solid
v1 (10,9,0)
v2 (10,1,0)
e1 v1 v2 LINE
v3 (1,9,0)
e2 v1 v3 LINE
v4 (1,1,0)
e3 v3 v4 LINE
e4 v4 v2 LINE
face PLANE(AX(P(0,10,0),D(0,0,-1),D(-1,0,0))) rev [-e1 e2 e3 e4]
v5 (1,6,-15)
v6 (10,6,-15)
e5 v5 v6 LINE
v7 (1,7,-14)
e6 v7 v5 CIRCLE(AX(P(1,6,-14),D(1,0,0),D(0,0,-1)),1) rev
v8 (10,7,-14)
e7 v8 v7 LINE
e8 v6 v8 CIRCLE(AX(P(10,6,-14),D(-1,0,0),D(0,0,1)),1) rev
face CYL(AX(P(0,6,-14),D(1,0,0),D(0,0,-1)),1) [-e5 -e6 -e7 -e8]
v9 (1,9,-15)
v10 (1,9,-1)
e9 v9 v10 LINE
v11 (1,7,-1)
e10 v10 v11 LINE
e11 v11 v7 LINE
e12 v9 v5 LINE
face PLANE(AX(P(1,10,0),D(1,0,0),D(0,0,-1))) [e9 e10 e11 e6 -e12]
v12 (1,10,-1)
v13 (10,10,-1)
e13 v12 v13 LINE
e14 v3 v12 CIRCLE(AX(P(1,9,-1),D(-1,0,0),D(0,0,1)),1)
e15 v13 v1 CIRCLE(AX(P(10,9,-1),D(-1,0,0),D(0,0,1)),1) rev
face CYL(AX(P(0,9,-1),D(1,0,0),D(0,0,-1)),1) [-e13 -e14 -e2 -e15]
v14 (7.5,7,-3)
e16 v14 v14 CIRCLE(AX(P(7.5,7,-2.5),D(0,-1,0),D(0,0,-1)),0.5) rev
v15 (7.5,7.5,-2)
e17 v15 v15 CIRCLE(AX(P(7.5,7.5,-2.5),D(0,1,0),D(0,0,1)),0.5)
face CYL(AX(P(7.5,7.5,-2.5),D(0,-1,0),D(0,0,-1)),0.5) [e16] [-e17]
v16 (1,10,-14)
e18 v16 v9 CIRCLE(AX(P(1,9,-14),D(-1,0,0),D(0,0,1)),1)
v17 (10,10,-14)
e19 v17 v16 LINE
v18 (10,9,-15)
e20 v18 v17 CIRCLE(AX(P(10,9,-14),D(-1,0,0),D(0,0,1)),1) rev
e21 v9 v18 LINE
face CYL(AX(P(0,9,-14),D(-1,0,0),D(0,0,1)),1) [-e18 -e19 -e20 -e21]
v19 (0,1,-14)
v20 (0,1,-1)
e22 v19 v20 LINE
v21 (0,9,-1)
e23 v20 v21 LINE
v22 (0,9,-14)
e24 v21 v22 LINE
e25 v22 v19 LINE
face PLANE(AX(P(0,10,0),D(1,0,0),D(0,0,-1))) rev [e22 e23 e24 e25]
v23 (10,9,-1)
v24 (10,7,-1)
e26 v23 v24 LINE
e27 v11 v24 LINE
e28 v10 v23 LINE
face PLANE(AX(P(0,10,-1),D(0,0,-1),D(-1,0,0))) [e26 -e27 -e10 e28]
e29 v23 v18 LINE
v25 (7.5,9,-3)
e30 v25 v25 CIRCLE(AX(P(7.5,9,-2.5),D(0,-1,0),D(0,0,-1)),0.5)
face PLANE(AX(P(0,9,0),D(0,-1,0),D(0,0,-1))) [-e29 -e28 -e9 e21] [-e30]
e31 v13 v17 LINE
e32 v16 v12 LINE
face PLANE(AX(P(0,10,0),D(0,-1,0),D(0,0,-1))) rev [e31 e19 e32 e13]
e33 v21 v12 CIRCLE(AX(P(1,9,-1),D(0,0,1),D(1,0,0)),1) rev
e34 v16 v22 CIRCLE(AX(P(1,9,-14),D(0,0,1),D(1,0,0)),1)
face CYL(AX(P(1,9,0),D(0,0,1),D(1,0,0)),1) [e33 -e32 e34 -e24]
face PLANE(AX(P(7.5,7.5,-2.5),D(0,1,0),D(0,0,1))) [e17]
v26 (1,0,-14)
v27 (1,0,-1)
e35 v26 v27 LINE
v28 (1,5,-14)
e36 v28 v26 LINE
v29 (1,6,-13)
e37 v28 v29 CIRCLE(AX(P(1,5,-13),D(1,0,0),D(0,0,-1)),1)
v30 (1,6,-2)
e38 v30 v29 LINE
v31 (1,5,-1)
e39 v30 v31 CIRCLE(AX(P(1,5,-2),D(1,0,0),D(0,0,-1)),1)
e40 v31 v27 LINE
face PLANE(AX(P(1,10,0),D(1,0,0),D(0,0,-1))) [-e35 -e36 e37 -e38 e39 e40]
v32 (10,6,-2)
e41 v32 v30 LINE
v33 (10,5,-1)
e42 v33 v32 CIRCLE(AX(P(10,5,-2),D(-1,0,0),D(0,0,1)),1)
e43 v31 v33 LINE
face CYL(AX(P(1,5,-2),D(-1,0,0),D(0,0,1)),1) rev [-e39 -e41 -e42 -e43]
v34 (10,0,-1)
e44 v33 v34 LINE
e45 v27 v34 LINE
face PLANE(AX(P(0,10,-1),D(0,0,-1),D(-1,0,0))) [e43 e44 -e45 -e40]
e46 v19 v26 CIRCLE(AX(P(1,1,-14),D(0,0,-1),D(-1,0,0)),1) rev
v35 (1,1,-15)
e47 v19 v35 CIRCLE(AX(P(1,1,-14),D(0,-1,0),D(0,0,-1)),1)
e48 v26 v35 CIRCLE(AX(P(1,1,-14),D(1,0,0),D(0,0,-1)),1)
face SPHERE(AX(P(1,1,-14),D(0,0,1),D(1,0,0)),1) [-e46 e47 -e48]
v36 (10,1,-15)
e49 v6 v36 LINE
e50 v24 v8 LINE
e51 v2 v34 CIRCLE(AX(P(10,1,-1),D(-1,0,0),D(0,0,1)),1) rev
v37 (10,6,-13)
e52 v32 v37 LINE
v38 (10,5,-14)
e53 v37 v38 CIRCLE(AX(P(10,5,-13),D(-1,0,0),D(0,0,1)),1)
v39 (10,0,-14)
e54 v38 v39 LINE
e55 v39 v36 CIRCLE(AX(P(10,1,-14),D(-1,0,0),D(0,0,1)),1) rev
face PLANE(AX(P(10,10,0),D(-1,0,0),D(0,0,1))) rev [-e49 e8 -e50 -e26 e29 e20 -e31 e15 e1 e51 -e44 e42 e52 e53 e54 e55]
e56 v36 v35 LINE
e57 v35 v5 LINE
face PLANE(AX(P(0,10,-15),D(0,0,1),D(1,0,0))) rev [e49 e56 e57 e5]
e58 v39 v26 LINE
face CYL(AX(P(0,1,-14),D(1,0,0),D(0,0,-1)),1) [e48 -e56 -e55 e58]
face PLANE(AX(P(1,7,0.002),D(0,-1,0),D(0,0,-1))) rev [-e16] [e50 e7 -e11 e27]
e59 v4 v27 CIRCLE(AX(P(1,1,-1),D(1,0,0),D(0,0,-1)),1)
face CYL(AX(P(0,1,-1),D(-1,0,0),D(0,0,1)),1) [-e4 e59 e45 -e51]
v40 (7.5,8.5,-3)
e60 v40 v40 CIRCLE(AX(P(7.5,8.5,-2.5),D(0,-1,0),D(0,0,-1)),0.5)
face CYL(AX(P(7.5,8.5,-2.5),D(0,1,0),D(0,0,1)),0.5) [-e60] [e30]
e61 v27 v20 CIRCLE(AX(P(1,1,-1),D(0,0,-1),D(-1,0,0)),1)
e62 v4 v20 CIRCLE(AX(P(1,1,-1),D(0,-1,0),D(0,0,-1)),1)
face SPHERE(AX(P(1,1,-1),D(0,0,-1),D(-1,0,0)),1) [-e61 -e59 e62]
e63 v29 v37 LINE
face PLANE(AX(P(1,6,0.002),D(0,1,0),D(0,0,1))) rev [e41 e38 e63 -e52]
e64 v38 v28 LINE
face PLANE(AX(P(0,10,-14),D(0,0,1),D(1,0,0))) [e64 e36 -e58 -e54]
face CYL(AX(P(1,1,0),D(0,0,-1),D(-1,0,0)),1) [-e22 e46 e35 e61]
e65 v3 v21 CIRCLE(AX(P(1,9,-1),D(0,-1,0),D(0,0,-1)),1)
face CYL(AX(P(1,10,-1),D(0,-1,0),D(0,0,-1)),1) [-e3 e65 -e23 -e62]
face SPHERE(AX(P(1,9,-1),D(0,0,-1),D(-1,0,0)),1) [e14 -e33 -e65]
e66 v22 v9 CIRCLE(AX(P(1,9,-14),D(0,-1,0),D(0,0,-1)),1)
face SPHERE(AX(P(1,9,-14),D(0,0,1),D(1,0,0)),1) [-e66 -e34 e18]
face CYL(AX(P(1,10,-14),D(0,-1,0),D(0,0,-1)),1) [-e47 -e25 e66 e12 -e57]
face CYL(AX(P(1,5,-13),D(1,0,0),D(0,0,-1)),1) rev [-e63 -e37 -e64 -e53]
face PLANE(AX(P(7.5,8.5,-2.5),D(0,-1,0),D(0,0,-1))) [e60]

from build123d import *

# Parameters (mm, degrees)
SKETCH1_W           = 10
SKETCH1_H           = 15
BOSS_EXTRUDE1_DEPTH = 10
SHELL1_T            = -1
BOSS_EXTRUDE4_REACH = 21.9
SKETCH5_W           = 9
SKETCH5_H           = 1
SKETCH3_R           = 0.5
BOSS_EXTRUDE3_DEPTH = 0.5
BOSS_EXTRUDE5_START = 0.5
SKETCH6_R           = 0.5
BOSS_EXTRUDE5_DEPTH = 0.5
SKETCH8_W           = 9
SKETCH8_H           = 13
CUT_EXTRUDE1_DEPTH  = 21.14944168
SKETCH10_W          = 1
SKETCH10_H          = 2
CUT_EXTRUDE4_DEPTH  = 9
FILLET1_R           = 1
FILLET2_R           = 1
FILLET3_R           = 1
FILLET5_R           = 1


with BuildPart() as part:
    # Sketch1 → Boss-Extrude1 (new body)
    with BuildSketch(Plane(origin=(0, 0, 0), x_dir=(1, 0, 0), z_dir=(0, 1, 0))):
        with Locations((5, 7.5)):
            Rectangle(SKETCH1_W, SKETCH1_H)
    extrude(amount=BOSS_EXTRUDE1_DEPTH)

    # Shell1
    shell1_openings = [part.faces().sort_by_distance(p)[0] for p in [
        (10, 5, -7.5),
    ]]
    offset(amount=SHELL1_T, openings=shell1_openings, kind=Kind.INTERSECTION)

    # Sketch5 → Boss-Extrude4 (add, up to next)
    with BuildSketch(Plane.XY.offset(-14), mode=Mode.PRIVATE) as boss_extrude4_sk1:
        with Locations((5.5, 6.5)):
            Rectangle(SKETCH5_W, SKETCH5_H)
    boss_extrude4_tool1 = extrude(boss_extrude4_sk1.sketch, amount=BOSS_EXTRUDE4_REACH, mode=Mode.PRIVATE) - part.part
    add(boss_extrude4_tool1.solids().sort_by_distance((5.5, 6.5, -14))[0])

    # Sketch3 → Boss-Extrude3 (add)
    with BuildSketch(Plane(origin=(0, 9, 0), x_dir=(-1, 0, 0), z_dir=(0, -1, 0))):
        with Locations(Location((-7.5, 2.5, 0), (0, 0, 90))):
            Circle(SKETCH3_R)
    extrude(amount=BOSS_EXTRUDE3_DEPTH)

    # Sketch6 → Boss-Extrude5 (add)
    with BuildSketch(Plane(origin=(0, 7, 0), x_dir=(1, 0, 0), z_dir=(0, 1, 0)).offset(BOSS_EXTRUDE5_START)):
        with Locations(Location((7.5, 2.5, 0), (0, 0, 90))):
            Circle(SKETCH6_R)
    extrude(amount=-BOSS_EXTRUDE5_DEPTH)

    # Sketch8 → Cut-Extrude1 (cut, through all)
    with BuildSketch(Plane(origin=(0, 1, 0), x_dir=(1, 0, 0), z_dir=(0, 1, 0))):
        with Locations((5.5, 7.5)):
            Rectangle(SKETCH8_W, SKETCH8_H)
    extrude(amount=-CUT_EXTRUDE1_DEPTH, mode=Mode.SUBTRACT)

    # Sketch10 → Cut-Extrude4 (cut)
    with BuildSketch(Plane(origin=(10, 0, 0), x_dir=(0, 0, -1), z_dir=(1, 0, 0))):
        with Locations((14.5, 8)):
            Rectangle(SKETCH10_W, SKETCH10_H)
    extrude(amount=-CUT_EXTRUDE4_DEPTH, mode=Mode.SUBTRACT)

    # Fillet1
    fillet1_edges = [part.edges().sort_by_distance(p)[0] for p in [
        (0, 10, -7.5),
        (0, 0, -7.5),
    ]]
    fillet(fillet1_edges, radius=FILLET1_R - 0.0001)  # a hair under: the kernel refuses the full size

    # Fillet2
    fillet2_edges = [part.edges().sort_by_distance(p)[0] for p in [
        (5.49995, 0, 0),
        (0.292863929, 0.292863929, 0),
        (0, 5, 0),
        (0.292863929, 9.707136071, 0),
        (5.49995, 10, 0),
    ]]
    fillet(fillet2_edges, radius=FILLET2_R - 0.0001)  # a hair under: the kernel refuses the full size

    # Fillet3
    fillet3_edges = [part.edges().sort_by_distance(p)[0] for p in [
        (5.49995, 0, -15),
        (0.292863929, 0.292863929, -15),
        (0, 5, -15),
        (0.292863929, 9.707136071, -15),
        (5.49995, 10, -15),
    ]]
    fillet(fillet3_edges, radius=FILLET3_R - 0.0001)  # a hair under: the kernel refuses the full size

    # Fillet5
    fillet5_edges = [part.edges().sort_by_distance(p)[0] for p in [
        (5.5, 6, -1),
        (5.5, 6, -14),
        (5.5, 7, -15),
    ]]
    fillet(fillet5_edges, radius=FILLET5_R)


solid = part.part
